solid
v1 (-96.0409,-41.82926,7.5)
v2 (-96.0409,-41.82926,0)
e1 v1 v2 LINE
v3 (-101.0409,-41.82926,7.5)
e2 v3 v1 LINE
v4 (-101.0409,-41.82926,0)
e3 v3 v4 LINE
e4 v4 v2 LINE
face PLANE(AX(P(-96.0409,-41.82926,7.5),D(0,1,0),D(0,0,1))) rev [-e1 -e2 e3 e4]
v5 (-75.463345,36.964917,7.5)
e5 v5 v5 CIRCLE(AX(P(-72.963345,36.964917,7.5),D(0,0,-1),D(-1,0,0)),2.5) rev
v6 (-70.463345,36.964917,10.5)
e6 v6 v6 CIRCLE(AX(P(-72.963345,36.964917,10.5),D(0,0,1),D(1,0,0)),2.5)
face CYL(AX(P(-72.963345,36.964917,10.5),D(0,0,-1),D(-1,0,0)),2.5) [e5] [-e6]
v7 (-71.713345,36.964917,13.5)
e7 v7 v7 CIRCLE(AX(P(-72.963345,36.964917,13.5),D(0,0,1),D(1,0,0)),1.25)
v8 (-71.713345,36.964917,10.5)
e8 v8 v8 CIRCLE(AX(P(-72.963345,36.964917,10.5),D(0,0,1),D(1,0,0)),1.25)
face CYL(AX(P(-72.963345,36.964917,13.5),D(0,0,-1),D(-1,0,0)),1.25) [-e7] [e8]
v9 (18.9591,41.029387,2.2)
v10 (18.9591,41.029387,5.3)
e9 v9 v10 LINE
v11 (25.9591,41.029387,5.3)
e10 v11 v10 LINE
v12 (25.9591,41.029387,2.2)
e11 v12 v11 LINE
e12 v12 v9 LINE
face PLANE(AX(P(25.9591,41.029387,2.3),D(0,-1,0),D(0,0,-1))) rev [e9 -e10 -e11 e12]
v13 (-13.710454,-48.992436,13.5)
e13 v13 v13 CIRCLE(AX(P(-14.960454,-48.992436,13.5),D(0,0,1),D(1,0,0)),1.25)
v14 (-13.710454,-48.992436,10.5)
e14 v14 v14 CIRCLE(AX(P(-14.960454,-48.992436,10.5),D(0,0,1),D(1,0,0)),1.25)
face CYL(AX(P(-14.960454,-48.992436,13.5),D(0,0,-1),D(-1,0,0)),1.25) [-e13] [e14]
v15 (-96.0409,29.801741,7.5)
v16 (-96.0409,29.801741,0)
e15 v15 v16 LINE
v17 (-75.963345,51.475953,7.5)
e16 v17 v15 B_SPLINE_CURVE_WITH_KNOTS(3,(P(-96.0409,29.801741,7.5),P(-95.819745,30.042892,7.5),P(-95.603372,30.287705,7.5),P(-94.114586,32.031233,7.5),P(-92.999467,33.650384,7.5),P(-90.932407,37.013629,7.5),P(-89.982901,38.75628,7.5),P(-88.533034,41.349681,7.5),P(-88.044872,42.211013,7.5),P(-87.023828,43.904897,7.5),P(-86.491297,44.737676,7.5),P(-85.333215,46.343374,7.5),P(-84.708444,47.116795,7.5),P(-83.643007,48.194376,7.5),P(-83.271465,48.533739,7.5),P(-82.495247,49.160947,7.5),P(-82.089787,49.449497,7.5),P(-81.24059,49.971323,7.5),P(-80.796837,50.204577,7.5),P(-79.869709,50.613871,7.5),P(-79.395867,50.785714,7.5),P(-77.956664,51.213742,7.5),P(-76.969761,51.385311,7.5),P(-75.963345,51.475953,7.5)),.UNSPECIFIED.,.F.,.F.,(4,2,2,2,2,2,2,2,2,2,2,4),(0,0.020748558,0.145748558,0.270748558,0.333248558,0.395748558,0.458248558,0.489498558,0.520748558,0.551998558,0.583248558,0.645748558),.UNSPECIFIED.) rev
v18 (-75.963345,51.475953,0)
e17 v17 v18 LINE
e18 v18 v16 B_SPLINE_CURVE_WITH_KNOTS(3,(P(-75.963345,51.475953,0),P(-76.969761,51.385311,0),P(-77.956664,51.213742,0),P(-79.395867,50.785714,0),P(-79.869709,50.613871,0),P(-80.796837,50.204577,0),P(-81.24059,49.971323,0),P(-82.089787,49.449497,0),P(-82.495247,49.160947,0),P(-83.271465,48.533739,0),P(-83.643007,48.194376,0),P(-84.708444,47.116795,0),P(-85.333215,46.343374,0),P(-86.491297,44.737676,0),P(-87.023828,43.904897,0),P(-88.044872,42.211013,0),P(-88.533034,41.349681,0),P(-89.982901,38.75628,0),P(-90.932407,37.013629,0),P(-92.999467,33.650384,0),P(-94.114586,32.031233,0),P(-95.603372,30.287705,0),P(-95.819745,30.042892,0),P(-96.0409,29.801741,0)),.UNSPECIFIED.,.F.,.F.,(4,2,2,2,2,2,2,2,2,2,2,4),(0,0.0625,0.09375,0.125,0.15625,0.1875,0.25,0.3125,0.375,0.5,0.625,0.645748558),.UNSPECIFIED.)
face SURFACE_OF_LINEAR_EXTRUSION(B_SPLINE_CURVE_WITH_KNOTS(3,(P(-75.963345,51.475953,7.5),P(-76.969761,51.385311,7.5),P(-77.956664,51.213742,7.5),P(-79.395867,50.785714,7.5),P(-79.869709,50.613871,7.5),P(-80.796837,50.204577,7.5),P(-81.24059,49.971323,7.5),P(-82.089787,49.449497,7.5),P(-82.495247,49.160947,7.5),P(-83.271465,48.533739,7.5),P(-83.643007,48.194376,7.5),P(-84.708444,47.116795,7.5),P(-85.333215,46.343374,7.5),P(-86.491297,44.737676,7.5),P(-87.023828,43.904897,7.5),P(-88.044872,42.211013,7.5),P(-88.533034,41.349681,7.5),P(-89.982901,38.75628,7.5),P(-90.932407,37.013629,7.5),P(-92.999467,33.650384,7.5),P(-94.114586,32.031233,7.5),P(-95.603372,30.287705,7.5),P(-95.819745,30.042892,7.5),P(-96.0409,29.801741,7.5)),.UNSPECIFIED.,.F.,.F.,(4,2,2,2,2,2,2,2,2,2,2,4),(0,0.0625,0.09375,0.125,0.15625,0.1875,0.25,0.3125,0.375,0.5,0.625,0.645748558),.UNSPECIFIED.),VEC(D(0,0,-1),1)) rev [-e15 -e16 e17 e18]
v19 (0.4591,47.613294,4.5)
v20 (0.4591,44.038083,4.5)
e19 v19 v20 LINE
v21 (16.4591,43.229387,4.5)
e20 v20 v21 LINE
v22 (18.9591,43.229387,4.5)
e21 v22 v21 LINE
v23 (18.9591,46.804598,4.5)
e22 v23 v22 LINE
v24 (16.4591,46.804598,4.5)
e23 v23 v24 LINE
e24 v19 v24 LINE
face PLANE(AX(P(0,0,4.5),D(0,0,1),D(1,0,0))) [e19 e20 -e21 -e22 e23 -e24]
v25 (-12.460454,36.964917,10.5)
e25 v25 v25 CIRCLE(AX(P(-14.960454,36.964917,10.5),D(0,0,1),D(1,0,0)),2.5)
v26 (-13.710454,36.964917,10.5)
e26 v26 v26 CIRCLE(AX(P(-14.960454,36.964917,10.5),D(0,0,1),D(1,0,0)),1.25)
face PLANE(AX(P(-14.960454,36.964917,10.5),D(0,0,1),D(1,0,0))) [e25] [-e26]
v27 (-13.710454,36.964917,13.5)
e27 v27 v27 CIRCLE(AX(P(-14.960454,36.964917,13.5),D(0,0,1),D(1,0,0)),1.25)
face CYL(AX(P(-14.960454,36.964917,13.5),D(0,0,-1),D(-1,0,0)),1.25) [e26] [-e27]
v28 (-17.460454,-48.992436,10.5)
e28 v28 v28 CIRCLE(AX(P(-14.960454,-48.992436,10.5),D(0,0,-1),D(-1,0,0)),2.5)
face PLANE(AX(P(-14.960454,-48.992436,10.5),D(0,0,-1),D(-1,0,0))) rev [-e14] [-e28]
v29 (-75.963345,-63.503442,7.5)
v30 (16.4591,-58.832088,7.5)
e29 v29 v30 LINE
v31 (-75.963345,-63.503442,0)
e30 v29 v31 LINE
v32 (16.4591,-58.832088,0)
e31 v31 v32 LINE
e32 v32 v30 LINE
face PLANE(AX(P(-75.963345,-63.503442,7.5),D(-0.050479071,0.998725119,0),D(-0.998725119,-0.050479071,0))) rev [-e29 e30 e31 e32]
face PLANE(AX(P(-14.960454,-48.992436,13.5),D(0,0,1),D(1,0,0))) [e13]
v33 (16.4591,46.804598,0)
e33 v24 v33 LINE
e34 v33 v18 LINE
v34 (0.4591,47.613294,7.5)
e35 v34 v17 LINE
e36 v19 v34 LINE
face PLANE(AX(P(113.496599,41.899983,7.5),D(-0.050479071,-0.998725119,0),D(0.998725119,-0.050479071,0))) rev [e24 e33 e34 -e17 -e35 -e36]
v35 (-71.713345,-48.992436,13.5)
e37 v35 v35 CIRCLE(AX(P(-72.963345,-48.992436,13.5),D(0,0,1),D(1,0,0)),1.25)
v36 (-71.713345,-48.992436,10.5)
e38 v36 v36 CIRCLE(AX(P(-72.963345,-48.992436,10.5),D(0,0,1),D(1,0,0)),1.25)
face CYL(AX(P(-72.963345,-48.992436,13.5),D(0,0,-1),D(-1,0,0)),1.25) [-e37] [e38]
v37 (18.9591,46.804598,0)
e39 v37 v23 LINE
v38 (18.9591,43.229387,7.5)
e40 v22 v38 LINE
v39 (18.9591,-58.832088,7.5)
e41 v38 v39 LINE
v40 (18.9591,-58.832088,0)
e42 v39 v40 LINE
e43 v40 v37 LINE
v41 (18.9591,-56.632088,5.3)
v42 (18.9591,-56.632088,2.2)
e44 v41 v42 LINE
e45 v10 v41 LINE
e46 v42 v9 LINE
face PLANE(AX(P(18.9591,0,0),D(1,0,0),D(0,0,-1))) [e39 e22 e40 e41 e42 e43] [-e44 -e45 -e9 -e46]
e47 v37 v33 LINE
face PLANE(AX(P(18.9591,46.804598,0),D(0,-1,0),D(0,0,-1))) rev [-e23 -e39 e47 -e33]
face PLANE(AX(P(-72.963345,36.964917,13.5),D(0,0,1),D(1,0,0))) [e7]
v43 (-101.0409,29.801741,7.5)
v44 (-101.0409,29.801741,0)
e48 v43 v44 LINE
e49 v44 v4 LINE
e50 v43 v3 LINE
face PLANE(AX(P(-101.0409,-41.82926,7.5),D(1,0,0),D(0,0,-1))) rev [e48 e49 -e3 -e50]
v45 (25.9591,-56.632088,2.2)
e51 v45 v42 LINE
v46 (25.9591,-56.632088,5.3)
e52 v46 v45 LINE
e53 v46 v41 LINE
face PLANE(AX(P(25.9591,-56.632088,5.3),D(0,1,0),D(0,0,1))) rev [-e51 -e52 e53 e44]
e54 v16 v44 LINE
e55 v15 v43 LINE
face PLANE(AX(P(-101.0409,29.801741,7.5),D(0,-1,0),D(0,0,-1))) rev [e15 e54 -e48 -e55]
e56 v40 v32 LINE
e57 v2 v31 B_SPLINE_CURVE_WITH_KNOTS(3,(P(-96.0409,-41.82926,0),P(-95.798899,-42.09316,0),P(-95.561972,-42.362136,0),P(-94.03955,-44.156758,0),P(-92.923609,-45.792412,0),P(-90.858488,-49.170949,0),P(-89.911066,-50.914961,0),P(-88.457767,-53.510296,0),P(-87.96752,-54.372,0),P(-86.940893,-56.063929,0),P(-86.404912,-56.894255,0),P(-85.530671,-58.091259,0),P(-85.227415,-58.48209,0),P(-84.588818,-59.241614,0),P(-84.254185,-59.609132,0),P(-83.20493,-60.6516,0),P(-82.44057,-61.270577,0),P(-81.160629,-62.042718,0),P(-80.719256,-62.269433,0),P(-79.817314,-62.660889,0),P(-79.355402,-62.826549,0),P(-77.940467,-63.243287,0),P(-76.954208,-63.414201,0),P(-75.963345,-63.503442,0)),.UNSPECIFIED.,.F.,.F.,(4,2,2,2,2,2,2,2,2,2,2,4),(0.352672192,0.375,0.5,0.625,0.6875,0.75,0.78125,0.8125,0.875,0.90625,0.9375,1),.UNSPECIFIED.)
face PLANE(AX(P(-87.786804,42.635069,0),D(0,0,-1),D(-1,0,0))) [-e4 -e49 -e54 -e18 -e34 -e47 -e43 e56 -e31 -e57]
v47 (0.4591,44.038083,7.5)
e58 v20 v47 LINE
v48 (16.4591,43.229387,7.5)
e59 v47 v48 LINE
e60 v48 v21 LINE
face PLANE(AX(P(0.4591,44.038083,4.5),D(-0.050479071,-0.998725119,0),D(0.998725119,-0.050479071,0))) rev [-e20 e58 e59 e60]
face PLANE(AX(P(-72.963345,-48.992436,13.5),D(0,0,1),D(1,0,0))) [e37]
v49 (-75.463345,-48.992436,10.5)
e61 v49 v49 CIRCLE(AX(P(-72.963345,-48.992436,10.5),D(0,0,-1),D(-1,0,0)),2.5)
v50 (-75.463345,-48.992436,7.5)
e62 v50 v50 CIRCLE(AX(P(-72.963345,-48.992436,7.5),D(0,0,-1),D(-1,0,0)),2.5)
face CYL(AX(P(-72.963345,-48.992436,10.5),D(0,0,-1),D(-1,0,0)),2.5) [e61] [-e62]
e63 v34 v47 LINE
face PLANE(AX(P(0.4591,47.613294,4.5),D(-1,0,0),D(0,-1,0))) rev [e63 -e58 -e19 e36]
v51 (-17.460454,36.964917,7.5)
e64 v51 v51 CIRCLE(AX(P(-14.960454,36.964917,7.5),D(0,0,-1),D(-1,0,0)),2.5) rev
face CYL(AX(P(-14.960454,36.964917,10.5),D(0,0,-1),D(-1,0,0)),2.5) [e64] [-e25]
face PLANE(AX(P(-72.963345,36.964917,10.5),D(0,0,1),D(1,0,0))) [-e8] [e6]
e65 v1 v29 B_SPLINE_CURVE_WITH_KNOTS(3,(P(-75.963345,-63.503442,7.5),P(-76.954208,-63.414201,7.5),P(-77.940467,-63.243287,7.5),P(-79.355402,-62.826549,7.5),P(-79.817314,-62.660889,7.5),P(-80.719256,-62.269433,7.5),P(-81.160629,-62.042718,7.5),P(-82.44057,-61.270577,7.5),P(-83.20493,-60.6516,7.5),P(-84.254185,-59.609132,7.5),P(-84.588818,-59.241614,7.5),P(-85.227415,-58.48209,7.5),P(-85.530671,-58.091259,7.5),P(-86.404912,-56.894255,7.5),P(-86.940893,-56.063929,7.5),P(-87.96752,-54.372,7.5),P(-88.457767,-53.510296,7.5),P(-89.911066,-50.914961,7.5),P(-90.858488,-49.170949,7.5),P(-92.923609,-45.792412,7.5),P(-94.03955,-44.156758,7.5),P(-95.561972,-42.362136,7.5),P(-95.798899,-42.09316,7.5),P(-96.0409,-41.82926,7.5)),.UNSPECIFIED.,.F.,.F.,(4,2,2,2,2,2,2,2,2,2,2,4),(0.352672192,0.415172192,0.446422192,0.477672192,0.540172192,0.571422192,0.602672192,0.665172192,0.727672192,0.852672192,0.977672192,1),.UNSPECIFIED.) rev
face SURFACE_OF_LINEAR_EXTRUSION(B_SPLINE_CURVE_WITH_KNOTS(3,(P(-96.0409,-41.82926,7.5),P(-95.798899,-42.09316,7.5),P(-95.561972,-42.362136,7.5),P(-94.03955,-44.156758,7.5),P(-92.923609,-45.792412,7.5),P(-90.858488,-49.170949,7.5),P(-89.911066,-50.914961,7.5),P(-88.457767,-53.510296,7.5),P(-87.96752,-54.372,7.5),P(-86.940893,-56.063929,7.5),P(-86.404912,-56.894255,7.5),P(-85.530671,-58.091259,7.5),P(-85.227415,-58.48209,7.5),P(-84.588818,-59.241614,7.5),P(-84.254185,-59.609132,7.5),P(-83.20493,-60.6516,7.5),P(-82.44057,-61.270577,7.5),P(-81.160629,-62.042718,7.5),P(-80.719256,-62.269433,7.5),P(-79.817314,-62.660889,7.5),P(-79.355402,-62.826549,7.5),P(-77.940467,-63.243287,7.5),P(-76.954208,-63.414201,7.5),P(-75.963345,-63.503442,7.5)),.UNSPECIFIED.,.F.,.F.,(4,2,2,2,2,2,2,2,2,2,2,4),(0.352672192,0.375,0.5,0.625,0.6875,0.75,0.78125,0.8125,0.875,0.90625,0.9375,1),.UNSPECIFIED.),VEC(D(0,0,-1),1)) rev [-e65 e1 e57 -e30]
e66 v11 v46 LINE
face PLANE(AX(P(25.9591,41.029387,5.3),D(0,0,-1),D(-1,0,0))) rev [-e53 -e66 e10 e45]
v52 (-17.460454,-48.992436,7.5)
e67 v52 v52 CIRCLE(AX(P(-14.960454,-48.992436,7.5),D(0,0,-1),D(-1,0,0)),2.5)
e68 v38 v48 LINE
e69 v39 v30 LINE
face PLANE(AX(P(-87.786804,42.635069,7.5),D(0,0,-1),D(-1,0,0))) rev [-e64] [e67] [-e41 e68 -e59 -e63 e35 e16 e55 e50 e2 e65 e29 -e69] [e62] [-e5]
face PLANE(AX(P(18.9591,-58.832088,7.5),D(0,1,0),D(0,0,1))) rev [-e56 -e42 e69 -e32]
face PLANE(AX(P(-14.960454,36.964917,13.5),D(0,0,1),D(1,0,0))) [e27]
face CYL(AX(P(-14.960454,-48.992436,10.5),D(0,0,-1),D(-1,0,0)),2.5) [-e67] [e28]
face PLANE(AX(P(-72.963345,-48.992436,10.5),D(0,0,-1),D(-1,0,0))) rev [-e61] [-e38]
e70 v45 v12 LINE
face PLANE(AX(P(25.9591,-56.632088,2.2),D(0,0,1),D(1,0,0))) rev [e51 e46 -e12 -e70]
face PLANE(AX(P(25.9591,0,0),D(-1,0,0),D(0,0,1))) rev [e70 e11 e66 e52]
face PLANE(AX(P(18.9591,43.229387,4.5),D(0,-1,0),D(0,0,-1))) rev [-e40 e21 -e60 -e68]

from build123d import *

# Parameters (mm, degrees)
STOCK_BATTERY_BASE_1_DEPTH   = 7.5
STOCK_BATTERY_BASE_1_2_DEPTH = 4.5
BOSS_EXTRUDE1_DEPTH          = 2.5
BOSS_EXTRUDE2_DEPTH          = 7
SKETCH3_R                    = 2.5
BOSS_EXTRUDE4_DEPTH          = 3
SKETCH4_R                    = 1.25
BOSS_EXTRUDE5_DEPTH          = 3


# Read off the part's stored shape, not the designer's step: Stock-battery base-1
with BuildPart() as part:
    # Stock-battery base-1 outline → Stock-battery base-1 (new body)
    with BuildSketch(Plane.XY):
        with BuildLine():
            Line((16.459100066, -58.832087736), (16.459100066, 43.22938712))
            Line((16.459100066, 43.22938712), (0.459100066, 44.038083245))
            Line((0.459100066, 44.038083245), (0.459100066, 47.61329436))
            Line((0.459100066, 47.61329436), (-75.963345356, 51.475952827))
            add(Edge.make_bspline(
                [(-75.963345356, 51.475952827), (-76.969760945, 51.385311169), (-77.956664013, 51.213742336), (-79.395866789, 50.78571401), (-79.86970863, 50.613871194), (-80.796837185, 50.204577199), (-81.240590365, 49.971323111), (-82.089787414, 49.449496549), (-82.495246976, 49.160946736), (-83.271465049, 48.533739024), (-83.643007435, 48.194375714), (-84.708444042, 47.116795042), (-85.333215001, 46.343374139), (-86.491296884, 44.737676097), (-87.023827607, 43.904896882), (-88.044872363, 42.211012893), (-88.533034054, 41.34968138), (-89.982900727, 38.756279626), (-90.93240726, 37.013628654), (-92.999467157, 33.650383947), (-94.114586107, 32.031232641), (-95.60337212, 30.287705281), (-95.819744565, 30.042891916), (-96.040899934, 29.801740739)],
                knots=[0, 0, 0, 0, 0.0625, 0.0625, 0.09375, 0.09375, 0.125, 0.125, 0.15625, 0.15625, 0.1875, 0.1875, 0.25, 0.25, 0.3125, 0.3125, 0.375, 0.375, 0.5, 0.5, 0.625, 0.625, 0.645748558, 0.645748558, 0.645748558, 0.645748558], degree=3))
            Line((-96.040899934, 29.801740739), (-101.040899934, 29.801740739))
            Line((-101.040899934, 29.801740739), (-101.040899934, -41.829259963))
            Line((-101.040899934, -41.829259963), (-96.040899934, -41.829259963))
            add(Edge.make_bspline(
                [(-96.040899934, -41.829259963), (-95.798899268, -42.093160096), (-95.56197213, -42.362136183), (-94.03954966, -44.156758027), (-92.923608678, -45.792412437), (-90.858487716, -49.170948695), (-89.911065512, -50.914960796), (-88.457766632, -53.51029646), (-87.967520262, -54.371999904), (-86.940892781, -56.06392928), (-86.404912323, -56.894254814), (-85.530671439, -58.091259413), (-85.227414802, -58.482089731), (-84.588818098, -59.241614046), (-84.254184704, -59.609132259), (-83.204929916, -60.651600397), (-82.440569541, -61.270576891), (-81.160629249, -62.042718444), (-80.719255742, -62.269433113), (-79.817314106, -62.660888928), (-79.3554021, -62.826549047), (-77.940467092, -63.243286827), (-76.954208328, -63.414201398), (-75.963345356, -63.503442328)],
                knots=[0.352672192, 0.352672192, 0.352672192, 0.352672192, 0.375, 0.375, 0.5, 0.5, 0.625, 0.625, 0.6875, 0.6875, 0.75, 0.75, 0.78125, 0.78125, 0.8125, 0.8125, 0.875, 0.875, 0.90625, 0.90625, 0.9375, 0.9375, 1, 1, 1, 1], degree=3))
            Line((-75.963345356, -63.503442328), (16.459100066, -58.832087736))
        make_face()
    extrude(amount=STOCK_BATTERY_BASE_1_DEPTH)

    # Stock-battery base-1 2 outline → Stock-battery base-1 2 (add)
    with BuildSketch(Plane.XY):
        Polygon((16.459100066, 43.22938712), (16.459100066, 46.804598235), (0.459100066, 47.61329436), (0.459100066, 44.038083245), align=None)
    extrude(amount=STOCK_BATTERY_BASE_1_2_DEPTH)

    # Sketch1 → Boss-Extrude1 (add)
    with BuildSketch(Plane(origin=(16.459100066, 0, 0), x_dir=(0, 0, -1), z_dir=(1, 0, 0))):
        Polygon((0, -58.832087736), (0, 46.804598235), (-4.5, 46.804598235), (-4.5, 43.22938712), (-7.5, 43.22938712), (-7.5, -58.832087736), align=None)
    extrude(amount=BOSS_EXTRUDE1_DEPTH)

    # Sketch2 → Boss-Extrude2 (add)
    with BuildSketch(Plane(origin=(18.959100066, 0, 0), x_dir=(0, 0, -1), z_dir=(1, 0, 0))):
        Polygon((-2.3, 41.02938712), (-2.2, 41.02938712), (-2.2, -56.632087736), (-5.3, -56.632087736), (-5.3, 41.02938712), align=None)
    extrude(amount=BOSS_EXTRUDE2_DEPTH)

    # Sketch3 → Boss-Extrude4 (add)
    with BuildSketch(Plane.XY.offset(7.5)):
        with Locations(Location((-72.963345356, 36.964917072, 0), (0, 0, 180))):
            Circle(SKETCH3_R)
        with Locations(Location((-14.960454045, 36.964917072, 0), (0, 0, 180))):
            Circle(SKETCH3_R)
        with Locations(Location((-14.960454045, -48.992436296, 0), (0, 0, 180))):
            Circle(SKETCH3_R)
        with Locations(Location((-72.963345356, -48.992436296, 0), (0, 0, 180))):
            Circle(SKETCH3_R)
    extrude(amount=BOSS_EXTRUDE4_DEPTH)

    # Sketch4 → Boss-Extrude5 (add)
    with BuildSketch(Plane.XY.offset(10.5)):
        with Locations((-72.963345356, 36.964917072)):
            Circle(SKETCH4_R)
        with Locations((-14.960454045, 36.964917072)):
            Circle(SKETCH4_R)
        with Locations((-72.963345356, -48.992436296)):
            Circle(SKETCH4_R)
        with Locations((-14.960454045, -48.992436296)):
            Circle(SKETCH4_R)
    extrude(amount=BOSS_EXTRUDE5_DEPTH)


solid = part.part
